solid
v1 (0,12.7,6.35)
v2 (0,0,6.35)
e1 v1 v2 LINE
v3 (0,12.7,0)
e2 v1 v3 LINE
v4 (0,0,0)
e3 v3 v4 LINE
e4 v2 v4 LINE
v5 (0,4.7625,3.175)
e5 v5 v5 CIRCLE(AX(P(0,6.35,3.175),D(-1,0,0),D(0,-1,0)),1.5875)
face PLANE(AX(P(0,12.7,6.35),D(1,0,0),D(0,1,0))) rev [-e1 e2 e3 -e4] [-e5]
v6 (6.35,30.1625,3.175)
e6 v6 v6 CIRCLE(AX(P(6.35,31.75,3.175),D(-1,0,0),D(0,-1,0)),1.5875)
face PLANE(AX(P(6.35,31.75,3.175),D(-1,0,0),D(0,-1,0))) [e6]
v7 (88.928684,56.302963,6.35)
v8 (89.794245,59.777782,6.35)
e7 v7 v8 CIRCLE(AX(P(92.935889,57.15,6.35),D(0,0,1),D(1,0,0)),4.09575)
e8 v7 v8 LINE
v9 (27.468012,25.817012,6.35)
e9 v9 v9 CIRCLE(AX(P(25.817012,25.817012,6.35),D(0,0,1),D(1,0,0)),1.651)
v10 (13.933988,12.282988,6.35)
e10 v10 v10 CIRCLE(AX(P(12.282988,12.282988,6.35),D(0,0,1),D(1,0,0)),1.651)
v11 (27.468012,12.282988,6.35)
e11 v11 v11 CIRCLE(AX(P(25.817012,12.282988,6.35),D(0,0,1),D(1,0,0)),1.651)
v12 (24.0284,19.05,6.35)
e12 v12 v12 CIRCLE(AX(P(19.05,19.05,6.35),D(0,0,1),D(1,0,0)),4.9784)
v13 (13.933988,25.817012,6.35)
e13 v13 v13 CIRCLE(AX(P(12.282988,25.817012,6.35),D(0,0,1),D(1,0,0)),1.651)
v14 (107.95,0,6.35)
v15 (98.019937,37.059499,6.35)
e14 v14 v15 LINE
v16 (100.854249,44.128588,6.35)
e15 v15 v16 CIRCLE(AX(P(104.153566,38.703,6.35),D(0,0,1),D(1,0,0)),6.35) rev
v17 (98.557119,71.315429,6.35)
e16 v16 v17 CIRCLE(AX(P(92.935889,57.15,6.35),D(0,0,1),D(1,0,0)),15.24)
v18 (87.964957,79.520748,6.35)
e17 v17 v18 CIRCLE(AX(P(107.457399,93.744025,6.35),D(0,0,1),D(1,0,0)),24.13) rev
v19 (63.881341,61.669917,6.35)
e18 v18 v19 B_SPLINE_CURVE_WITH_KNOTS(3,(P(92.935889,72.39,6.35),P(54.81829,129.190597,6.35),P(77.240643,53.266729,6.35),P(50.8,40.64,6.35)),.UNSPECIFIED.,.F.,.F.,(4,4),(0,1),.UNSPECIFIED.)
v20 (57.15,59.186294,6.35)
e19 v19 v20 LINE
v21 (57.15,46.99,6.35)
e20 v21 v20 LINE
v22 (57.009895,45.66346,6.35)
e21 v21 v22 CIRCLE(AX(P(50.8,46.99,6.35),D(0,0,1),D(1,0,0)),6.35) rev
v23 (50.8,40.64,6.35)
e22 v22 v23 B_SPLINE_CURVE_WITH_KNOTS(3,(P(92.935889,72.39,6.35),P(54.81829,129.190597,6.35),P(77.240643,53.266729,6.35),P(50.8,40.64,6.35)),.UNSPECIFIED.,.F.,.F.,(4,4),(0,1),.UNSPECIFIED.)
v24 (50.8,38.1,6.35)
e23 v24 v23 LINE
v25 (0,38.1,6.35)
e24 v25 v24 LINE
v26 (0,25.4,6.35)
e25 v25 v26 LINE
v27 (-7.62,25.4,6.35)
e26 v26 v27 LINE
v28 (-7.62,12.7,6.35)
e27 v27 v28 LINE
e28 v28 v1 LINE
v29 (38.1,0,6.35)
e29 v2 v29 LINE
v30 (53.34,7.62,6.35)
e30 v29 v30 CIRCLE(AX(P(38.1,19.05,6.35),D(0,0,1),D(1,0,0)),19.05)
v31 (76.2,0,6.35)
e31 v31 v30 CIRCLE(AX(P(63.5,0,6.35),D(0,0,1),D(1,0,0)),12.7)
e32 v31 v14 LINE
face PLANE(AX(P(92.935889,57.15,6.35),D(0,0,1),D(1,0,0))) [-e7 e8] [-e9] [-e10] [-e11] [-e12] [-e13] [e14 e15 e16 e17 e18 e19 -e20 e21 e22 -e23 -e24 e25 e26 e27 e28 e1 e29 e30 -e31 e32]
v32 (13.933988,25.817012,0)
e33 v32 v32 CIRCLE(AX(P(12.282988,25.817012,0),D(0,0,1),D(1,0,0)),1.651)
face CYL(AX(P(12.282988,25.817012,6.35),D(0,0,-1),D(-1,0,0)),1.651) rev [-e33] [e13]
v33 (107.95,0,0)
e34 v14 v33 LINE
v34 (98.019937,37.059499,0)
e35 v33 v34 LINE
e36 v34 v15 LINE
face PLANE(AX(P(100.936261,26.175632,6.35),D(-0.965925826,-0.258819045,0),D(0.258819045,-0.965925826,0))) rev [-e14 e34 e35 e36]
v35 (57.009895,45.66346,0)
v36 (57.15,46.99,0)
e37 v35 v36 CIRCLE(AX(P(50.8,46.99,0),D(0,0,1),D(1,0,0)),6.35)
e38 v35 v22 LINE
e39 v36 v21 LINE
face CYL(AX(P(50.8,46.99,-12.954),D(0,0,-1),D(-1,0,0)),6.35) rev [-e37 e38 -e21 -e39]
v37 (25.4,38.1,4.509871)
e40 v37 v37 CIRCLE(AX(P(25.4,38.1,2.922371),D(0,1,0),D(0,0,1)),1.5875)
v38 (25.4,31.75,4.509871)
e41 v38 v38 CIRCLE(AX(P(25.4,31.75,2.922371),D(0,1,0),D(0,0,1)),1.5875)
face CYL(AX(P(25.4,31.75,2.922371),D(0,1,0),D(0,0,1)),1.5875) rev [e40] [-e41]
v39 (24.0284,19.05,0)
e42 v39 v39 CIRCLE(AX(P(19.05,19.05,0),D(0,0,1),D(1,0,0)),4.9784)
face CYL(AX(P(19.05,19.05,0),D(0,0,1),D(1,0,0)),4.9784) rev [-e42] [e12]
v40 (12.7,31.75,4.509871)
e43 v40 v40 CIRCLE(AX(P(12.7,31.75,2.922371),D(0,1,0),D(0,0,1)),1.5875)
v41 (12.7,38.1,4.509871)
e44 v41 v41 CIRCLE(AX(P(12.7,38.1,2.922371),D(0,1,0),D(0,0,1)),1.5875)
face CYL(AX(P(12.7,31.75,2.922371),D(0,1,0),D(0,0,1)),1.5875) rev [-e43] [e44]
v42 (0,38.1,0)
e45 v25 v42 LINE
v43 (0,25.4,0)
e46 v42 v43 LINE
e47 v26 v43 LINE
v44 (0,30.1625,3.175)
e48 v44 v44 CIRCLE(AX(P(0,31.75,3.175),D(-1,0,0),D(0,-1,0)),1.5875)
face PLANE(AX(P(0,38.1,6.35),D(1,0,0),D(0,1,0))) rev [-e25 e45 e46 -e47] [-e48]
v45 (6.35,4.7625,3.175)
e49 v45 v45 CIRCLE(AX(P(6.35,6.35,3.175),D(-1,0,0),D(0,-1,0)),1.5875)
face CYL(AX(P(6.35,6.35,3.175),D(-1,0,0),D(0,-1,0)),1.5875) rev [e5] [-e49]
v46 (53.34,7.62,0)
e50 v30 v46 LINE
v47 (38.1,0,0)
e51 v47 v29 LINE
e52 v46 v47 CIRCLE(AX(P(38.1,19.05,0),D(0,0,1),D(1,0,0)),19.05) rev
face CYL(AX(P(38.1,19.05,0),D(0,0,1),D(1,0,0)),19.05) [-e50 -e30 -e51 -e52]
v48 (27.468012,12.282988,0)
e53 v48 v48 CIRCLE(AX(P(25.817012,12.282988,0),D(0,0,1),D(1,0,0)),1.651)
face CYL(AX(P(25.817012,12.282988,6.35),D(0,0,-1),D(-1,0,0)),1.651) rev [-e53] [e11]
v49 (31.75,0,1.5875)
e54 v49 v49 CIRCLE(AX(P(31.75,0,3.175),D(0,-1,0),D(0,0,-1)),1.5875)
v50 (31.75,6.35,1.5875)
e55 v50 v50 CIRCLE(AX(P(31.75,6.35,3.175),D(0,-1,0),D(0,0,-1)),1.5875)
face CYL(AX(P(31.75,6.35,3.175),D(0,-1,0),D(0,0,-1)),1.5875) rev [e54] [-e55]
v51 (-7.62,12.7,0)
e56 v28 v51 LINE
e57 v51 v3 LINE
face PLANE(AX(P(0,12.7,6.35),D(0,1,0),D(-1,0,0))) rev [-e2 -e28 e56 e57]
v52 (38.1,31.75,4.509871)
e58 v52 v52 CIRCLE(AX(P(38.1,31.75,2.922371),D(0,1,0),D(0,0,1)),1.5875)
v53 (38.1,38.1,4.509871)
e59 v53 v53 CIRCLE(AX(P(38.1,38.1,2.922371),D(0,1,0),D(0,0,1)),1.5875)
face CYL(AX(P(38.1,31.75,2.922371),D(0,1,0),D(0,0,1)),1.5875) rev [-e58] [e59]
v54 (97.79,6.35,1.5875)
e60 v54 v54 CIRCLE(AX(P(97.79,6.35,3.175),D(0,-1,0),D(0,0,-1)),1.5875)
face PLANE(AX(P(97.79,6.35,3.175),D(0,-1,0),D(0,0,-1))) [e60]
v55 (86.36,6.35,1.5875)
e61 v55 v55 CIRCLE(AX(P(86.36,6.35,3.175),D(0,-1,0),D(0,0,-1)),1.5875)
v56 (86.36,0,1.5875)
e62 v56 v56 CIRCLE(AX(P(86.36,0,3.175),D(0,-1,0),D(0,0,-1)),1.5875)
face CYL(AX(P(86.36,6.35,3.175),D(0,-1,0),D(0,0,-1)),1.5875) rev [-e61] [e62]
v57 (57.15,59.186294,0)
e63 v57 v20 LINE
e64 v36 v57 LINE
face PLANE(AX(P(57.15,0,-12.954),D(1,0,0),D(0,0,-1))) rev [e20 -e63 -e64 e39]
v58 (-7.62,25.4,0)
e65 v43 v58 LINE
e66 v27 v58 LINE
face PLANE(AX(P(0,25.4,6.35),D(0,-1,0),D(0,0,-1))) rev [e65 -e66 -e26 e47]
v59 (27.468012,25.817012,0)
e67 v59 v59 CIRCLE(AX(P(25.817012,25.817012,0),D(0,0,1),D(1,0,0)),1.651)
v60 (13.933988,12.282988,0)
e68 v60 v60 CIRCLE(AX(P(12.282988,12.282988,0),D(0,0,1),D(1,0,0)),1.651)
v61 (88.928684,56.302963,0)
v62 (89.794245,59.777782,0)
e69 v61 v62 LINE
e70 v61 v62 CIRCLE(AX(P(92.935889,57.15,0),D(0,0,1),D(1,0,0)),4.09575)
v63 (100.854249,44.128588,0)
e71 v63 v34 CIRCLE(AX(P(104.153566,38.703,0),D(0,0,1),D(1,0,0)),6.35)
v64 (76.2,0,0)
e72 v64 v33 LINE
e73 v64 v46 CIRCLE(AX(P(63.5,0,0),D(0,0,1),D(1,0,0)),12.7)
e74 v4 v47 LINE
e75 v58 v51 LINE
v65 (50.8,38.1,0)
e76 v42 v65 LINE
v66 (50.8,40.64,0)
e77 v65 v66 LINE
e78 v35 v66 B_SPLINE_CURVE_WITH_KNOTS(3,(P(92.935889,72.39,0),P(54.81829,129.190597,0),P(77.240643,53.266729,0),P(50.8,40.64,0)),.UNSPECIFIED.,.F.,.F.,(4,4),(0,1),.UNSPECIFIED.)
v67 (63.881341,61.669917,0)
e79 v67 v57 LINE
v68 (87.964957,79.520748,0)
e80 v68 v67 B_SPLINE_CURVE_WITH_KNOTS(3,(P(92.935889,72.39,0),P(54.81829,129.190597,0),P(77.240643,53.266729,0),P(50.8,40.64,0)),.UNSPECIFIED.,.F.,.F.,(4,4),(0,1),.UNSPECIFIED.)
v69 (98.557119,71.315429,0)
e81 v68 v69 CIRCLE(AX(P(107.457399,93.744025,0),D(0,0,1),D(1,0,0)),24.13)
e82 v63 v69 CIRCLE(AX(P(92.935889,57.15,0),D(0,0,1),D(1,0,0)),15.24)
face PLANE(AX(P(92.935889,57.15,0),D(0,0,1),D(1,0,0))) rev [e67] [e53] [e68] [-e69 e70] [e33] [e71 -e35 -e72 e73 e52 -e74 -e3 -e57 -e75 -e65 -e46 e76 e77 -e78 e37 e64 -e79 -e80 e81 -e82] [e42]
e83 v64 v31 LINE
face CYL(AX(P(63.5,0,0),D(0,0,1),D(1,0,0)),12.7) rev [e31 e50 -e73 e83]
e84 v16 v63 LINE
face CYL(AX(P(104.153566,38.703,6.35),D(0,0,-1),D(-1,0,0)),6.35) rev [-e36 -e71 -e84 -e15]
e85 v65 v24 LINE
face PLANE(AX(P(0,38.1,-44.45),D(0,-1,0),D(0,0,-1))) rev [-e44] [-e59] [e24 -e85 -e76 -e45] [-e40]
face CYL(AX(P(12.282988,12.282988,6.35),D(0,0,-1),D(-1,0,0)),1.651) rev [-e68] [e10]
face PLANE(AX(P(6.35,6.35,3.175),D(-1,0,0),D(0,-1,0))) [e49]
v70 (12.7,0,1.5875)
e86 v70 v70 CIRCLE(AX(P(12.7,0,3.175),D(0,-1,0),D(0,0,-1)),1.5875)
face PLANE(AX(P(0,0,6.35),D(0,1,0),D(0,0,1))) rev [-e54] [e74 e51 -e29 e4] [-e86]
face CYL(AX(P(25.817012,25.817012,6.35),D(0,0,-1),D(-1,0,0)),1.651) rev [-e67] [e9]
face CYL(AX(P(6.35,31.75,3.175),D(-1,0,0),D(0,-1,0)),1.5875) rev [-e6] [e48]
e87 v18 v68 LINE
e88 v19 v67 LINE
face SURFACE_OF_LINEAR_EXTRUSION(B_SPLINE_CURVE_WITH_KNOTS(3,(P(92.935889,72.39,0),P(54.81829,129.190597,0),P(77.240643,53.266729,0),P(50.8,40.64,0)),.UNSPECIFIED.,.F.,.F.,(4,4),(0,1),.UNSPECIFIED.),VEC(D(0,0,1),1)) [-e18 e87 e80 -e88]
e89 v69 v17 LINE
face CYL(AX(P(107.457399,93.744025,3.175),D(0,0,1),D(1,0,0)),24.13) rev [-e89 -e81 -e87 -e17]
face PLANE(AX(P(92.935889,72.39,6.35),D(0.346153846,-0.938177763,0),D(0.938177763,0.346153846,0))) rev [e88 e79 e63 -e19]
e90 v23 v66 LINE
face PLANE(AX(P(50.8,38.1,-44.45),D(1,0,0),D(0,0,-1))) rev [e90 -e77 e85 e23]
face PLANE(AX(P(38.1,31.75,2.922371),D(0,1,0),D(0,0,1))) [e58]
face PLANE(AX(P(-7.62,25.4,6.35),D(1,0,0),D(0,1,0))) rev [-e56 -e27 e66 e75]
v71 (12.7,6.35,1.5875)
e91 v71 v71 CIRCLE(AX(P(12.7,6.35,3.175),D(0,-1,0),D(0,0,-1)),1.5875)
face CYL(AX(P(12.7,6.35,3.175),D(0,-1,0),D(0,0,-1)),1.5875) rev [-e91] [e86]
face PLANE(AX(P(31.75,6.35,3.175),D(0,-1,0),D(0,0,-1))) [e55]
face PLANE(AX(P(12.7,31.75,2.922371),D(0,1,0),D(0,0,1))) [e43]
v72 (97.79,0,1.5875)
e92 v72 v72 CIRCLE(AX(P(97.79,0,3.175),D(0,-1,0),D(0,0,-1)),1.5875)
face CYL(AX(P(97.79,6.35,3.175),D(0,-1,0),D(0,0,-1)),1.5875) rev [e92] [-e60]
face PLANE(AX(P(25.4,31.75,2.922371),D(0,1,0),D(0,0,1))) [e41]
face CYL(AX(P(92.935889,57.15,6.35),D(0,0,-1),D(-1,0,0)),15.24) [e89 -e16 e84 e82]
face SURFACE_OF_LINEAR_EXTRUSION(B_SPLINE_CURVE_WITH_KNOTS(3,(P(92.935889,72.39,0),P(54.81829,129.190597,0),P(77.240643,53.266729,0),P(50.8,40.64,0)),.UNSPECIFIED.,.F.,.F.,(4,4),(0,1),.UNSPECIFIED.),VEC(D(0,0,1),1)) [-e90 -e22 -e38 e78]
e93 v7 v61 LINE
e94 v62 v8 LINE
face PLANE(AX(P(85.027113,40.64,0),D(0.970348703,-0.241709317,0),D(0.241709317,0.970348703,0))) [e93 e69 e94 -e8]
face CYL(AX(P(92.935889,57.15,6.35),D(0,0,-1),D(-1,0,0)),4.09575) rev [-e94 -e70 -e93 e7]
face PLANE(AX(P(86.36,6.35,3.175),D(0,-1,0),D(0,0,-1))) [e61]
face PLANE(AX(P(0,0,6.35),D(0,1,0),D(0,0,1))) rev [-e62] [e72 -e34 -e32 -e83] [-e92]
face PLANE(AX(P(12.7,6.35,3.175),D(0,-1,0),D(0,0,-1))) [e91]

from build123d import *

# Parameters (mm, degrees)
SKETCH1_R           = 4.09575
SKETCH1_R_2         = 1.651
BOSS_EXTRUDE1_DEPTH = 6.35
SKETCH3_R           = 1.5875
CUT_EXTRUDE1_DEPTH  = 6.35
CUT_EXTRUDE2_DEPTH  = 6.35
SKETCH7_R           = 4.9784
CUT_EXTRUDE3_DEPTH  = 131.317526076
FILLET1_R           = 6.35
SKETCH8_W           = 50.8
SKETCH8_H           = 38.1
CUT_EXTRUDE4_DEPTH  = 50.8
CUT_EXTRUDE5_DEPTH  = 19.304
FILLET6_R           = 6.35
FILLET8_R           = 19.05
SKETCH10_R          = 1.5875
CUT_EXTRUDE6_DEPTH  = 6.35
SKETCH11_R          = 1.5875
CUT_EXTRUDE7_DEPTH  = 6.35
BOSS_EXTRUDE2_DEPTH = 6.35
FILLET9_R           = 24.13


with BuildPart() as part:
    # Sketch1 → Boss-Extrude1 (new body)
    with BuildSketch(Plane.XY):
        with BuildLine():
            Line((0, 0), (107.95, 0))
            Line((107.95, 0), (100.9362606, 26.175631792))
            Line((100.9362606, 26.175631792), (96.600438298, 42.357140917))
            ThreePointArc((96.600438298, 42.357140917), (108.063690957, 58.995863967), (92.935889192, 72.39))
            Line((92.935889192, 72.39), (0, 38.1))
            Line((0, 38.1), (0, 25.4))
            Line((0, 25.4), (-7.62, 25.4))
            Line((-7.62, 25.4), (-7.62, 12.7))
            Line((-7.62, 12.7), (0, 12.7))
            Line((0, 12.7), (0, 0))
        make_face()
        with Locations((92.935889192, 57.15)):
            Circle(SKETCH1_R, mode=Mode.SUBTRACT)
        with Locations((25.817011896, 25.817011896)):
            Circle(SKETCH1_R_2, mode=Mode.SUBTRACT)
        with Locations((25.817011896, 12.282988104)):
            Circle(SKETCH1_R_2, mode=Mode.SUBTRACT)
        with Locations((12.282988104, 12.282988104)):
            Circle(SKETCH1_R_2, mode=Mode.SUBTRACT)
        with Locations((12.282988104, 25.817011896)):
            Circle(SKETCH1_R_2, mode=Mode.SUBTRACT)
    extrude(amount=BOSS_EXTRUDE1_DEPTH)

    # Sketch3 → Cut-Extrude1 (cut)
    with BuildSketch(Plane.ZY):
        with Locations(Location((3.175, 31.75, 0), (0, 0, 270))):
            Circle(SKETCH3_R)
        with Locations(Location((3.175, 6.35, 0), (0, 0, 270))):
            Circle(SKETCH3_R)
    extrude(amount=-CUT_EXTRUDE1_DEPTH, mode=Mode.SUBTRACT)

    # Sketch6 → Cut-Extrude2 (cut)
    with BuildSketch(Plane.XY.offset(6.35)):
        with BuildLine():
            Line((50.8, 0), (76.2, 0))
            ThreePointArc((76.2, 0), (63.5, 12.7), (50.8, 0))
        make_face()
    extrude(amount=-CUT_EXTRUDE2_DEPTH, mode=Mode.SUBTRACT)

    # Sketch7 → Cut-Extrude3 (cut, through all)
    with BuildSketch(Plane.XY.offset(6.35)):
        with Locations((19.05, 19.05)):
            Circle(SKETCH7_R)
    extrude(amount=-CUT_EXTRUDE3_DEPTH, mode=Mode.SUBTRACT)

    # Fillet1
    fillet1_edges = [part.edges().sort_by_distance(p)[0] for p in [
        (96.600438298, 42.357140917, 3.175),
    ]]
    fillet(fillet1_edges, radius=FILLET1_R)

    # Sketch8 → Cut-Extrude4 (cut)
    with BuildSketch(Plane.XY.offset(6.35)):
        with Locations((25.4, 57.15)):
            Rectangle(SKETCH8_W, SKETCH8_H)
    extrude(amount=-CUT_EXTRUDE4_DEPTH, mode=Mode.SUBTRACT)

    # Sketch9 → Cut-Extrude5 (cut)
    with BuildSketch(Plane.XY.offset(6.35)):
        Polygon((50.8, 56.84337261), (50.8, 40.64), (57.15, 40.64), (57.15, 59.186294187), align=None)
    extrude(amount=-CUT_EXTRUDE5_DEPTH, mode=Mode.SUBTRACT)

    # Fillet6
    fillet6_edges = [part.edges().sort_by_distance(p)[0] for p in [
        (57.15, 40.64, 3.175),
    ]]
    fillet(fillet6_edges, radius=FILLET6_R - 0.0001)  # a hair under: the kernel refuses the full size

    # Fillet8
    fillet8_edges = [part.edges().sort_by_distance(p)[0] for p in [
        (50.8, 0, 3.175),
    ]]
    fillet(fillet8_edges, radius=FILLET8_R)

    # Sketch10 → Cut-Extrude6 (cut)
    with BuildSketch(Plane.XZ):
        with Locations(Location((97.79, 3.175, 0), (0, 0, 270))):
            Circle(SKETCH10_R)
        with Locations(Location((86.36, 3.175, 0), (0, 0, 270))):
            Circle(SKETCH10_R)
        with Locations(Location((31.75, 3.175, 0), (0, 0, 270))):
            Circle(SKETCH10_R)
        with Locations(Location((12.7, 3.175, 0), (0, 0, 270))):
            Circle(SKETCH10_R)
    extrude(amount=-CUT_EXTRUDE6_DEPTH, mode=Mode.SUBTRACT)

    # Sketch11 → Cut-Extrude7 (cut)
    with BuildSketch(Plane(origin=(0, 38.1, 0), x_dir=(1, 0, 0), z_dir=(0, 1, 0))):
        with Locations(Location((12.7, -2.922371253, 0), (0, 0, 270))):
            Circle(SKETCH11_R)
        with Locations(Location((25.4, -2.922371253, 0), (0, 0, 270))):
            Circle(SKETCH11_R)
        with Locations(Location((38.1, -2.922371253, 0), (0, 0, 270))):
            Circle(SKETCH11_R)
    extrude(amount=-CUT_EXTRUDE7_DEPTH, mode=Mode.SUBTRACT)

    # Sketch12 → Boss-Extrude2 (add)
    with BuildSketch(Plane.XY.offset(6.35)):
        with BuildLine():
            Line((50.8, 40.64), (85.027112904, 40.64))
            Line((85.027112904, 40.64), (92.935889192, 72.39))
            add(Edge.make_bspline(
                [(50.8, 40.64), (77.240642826, 53.266729026), (54.818289847, 129.190596971), (92.935889192, 72.39)],
                knots=[0, 0, 0, 0, 1, 1, 1, 1], degree=3))
        make_face()
    extrude(amount=-BOSS_EXTRUDE2_DEPTH)

    # Fillet9
    fillet9_edges = [part.edges().sort_by_distance(p)[0] for p in [
        (92.935889192, 72.39, 3.175),
    ]]
    fillet(fillet9_edges, radius=FILLET9_R)


solid = part.part
